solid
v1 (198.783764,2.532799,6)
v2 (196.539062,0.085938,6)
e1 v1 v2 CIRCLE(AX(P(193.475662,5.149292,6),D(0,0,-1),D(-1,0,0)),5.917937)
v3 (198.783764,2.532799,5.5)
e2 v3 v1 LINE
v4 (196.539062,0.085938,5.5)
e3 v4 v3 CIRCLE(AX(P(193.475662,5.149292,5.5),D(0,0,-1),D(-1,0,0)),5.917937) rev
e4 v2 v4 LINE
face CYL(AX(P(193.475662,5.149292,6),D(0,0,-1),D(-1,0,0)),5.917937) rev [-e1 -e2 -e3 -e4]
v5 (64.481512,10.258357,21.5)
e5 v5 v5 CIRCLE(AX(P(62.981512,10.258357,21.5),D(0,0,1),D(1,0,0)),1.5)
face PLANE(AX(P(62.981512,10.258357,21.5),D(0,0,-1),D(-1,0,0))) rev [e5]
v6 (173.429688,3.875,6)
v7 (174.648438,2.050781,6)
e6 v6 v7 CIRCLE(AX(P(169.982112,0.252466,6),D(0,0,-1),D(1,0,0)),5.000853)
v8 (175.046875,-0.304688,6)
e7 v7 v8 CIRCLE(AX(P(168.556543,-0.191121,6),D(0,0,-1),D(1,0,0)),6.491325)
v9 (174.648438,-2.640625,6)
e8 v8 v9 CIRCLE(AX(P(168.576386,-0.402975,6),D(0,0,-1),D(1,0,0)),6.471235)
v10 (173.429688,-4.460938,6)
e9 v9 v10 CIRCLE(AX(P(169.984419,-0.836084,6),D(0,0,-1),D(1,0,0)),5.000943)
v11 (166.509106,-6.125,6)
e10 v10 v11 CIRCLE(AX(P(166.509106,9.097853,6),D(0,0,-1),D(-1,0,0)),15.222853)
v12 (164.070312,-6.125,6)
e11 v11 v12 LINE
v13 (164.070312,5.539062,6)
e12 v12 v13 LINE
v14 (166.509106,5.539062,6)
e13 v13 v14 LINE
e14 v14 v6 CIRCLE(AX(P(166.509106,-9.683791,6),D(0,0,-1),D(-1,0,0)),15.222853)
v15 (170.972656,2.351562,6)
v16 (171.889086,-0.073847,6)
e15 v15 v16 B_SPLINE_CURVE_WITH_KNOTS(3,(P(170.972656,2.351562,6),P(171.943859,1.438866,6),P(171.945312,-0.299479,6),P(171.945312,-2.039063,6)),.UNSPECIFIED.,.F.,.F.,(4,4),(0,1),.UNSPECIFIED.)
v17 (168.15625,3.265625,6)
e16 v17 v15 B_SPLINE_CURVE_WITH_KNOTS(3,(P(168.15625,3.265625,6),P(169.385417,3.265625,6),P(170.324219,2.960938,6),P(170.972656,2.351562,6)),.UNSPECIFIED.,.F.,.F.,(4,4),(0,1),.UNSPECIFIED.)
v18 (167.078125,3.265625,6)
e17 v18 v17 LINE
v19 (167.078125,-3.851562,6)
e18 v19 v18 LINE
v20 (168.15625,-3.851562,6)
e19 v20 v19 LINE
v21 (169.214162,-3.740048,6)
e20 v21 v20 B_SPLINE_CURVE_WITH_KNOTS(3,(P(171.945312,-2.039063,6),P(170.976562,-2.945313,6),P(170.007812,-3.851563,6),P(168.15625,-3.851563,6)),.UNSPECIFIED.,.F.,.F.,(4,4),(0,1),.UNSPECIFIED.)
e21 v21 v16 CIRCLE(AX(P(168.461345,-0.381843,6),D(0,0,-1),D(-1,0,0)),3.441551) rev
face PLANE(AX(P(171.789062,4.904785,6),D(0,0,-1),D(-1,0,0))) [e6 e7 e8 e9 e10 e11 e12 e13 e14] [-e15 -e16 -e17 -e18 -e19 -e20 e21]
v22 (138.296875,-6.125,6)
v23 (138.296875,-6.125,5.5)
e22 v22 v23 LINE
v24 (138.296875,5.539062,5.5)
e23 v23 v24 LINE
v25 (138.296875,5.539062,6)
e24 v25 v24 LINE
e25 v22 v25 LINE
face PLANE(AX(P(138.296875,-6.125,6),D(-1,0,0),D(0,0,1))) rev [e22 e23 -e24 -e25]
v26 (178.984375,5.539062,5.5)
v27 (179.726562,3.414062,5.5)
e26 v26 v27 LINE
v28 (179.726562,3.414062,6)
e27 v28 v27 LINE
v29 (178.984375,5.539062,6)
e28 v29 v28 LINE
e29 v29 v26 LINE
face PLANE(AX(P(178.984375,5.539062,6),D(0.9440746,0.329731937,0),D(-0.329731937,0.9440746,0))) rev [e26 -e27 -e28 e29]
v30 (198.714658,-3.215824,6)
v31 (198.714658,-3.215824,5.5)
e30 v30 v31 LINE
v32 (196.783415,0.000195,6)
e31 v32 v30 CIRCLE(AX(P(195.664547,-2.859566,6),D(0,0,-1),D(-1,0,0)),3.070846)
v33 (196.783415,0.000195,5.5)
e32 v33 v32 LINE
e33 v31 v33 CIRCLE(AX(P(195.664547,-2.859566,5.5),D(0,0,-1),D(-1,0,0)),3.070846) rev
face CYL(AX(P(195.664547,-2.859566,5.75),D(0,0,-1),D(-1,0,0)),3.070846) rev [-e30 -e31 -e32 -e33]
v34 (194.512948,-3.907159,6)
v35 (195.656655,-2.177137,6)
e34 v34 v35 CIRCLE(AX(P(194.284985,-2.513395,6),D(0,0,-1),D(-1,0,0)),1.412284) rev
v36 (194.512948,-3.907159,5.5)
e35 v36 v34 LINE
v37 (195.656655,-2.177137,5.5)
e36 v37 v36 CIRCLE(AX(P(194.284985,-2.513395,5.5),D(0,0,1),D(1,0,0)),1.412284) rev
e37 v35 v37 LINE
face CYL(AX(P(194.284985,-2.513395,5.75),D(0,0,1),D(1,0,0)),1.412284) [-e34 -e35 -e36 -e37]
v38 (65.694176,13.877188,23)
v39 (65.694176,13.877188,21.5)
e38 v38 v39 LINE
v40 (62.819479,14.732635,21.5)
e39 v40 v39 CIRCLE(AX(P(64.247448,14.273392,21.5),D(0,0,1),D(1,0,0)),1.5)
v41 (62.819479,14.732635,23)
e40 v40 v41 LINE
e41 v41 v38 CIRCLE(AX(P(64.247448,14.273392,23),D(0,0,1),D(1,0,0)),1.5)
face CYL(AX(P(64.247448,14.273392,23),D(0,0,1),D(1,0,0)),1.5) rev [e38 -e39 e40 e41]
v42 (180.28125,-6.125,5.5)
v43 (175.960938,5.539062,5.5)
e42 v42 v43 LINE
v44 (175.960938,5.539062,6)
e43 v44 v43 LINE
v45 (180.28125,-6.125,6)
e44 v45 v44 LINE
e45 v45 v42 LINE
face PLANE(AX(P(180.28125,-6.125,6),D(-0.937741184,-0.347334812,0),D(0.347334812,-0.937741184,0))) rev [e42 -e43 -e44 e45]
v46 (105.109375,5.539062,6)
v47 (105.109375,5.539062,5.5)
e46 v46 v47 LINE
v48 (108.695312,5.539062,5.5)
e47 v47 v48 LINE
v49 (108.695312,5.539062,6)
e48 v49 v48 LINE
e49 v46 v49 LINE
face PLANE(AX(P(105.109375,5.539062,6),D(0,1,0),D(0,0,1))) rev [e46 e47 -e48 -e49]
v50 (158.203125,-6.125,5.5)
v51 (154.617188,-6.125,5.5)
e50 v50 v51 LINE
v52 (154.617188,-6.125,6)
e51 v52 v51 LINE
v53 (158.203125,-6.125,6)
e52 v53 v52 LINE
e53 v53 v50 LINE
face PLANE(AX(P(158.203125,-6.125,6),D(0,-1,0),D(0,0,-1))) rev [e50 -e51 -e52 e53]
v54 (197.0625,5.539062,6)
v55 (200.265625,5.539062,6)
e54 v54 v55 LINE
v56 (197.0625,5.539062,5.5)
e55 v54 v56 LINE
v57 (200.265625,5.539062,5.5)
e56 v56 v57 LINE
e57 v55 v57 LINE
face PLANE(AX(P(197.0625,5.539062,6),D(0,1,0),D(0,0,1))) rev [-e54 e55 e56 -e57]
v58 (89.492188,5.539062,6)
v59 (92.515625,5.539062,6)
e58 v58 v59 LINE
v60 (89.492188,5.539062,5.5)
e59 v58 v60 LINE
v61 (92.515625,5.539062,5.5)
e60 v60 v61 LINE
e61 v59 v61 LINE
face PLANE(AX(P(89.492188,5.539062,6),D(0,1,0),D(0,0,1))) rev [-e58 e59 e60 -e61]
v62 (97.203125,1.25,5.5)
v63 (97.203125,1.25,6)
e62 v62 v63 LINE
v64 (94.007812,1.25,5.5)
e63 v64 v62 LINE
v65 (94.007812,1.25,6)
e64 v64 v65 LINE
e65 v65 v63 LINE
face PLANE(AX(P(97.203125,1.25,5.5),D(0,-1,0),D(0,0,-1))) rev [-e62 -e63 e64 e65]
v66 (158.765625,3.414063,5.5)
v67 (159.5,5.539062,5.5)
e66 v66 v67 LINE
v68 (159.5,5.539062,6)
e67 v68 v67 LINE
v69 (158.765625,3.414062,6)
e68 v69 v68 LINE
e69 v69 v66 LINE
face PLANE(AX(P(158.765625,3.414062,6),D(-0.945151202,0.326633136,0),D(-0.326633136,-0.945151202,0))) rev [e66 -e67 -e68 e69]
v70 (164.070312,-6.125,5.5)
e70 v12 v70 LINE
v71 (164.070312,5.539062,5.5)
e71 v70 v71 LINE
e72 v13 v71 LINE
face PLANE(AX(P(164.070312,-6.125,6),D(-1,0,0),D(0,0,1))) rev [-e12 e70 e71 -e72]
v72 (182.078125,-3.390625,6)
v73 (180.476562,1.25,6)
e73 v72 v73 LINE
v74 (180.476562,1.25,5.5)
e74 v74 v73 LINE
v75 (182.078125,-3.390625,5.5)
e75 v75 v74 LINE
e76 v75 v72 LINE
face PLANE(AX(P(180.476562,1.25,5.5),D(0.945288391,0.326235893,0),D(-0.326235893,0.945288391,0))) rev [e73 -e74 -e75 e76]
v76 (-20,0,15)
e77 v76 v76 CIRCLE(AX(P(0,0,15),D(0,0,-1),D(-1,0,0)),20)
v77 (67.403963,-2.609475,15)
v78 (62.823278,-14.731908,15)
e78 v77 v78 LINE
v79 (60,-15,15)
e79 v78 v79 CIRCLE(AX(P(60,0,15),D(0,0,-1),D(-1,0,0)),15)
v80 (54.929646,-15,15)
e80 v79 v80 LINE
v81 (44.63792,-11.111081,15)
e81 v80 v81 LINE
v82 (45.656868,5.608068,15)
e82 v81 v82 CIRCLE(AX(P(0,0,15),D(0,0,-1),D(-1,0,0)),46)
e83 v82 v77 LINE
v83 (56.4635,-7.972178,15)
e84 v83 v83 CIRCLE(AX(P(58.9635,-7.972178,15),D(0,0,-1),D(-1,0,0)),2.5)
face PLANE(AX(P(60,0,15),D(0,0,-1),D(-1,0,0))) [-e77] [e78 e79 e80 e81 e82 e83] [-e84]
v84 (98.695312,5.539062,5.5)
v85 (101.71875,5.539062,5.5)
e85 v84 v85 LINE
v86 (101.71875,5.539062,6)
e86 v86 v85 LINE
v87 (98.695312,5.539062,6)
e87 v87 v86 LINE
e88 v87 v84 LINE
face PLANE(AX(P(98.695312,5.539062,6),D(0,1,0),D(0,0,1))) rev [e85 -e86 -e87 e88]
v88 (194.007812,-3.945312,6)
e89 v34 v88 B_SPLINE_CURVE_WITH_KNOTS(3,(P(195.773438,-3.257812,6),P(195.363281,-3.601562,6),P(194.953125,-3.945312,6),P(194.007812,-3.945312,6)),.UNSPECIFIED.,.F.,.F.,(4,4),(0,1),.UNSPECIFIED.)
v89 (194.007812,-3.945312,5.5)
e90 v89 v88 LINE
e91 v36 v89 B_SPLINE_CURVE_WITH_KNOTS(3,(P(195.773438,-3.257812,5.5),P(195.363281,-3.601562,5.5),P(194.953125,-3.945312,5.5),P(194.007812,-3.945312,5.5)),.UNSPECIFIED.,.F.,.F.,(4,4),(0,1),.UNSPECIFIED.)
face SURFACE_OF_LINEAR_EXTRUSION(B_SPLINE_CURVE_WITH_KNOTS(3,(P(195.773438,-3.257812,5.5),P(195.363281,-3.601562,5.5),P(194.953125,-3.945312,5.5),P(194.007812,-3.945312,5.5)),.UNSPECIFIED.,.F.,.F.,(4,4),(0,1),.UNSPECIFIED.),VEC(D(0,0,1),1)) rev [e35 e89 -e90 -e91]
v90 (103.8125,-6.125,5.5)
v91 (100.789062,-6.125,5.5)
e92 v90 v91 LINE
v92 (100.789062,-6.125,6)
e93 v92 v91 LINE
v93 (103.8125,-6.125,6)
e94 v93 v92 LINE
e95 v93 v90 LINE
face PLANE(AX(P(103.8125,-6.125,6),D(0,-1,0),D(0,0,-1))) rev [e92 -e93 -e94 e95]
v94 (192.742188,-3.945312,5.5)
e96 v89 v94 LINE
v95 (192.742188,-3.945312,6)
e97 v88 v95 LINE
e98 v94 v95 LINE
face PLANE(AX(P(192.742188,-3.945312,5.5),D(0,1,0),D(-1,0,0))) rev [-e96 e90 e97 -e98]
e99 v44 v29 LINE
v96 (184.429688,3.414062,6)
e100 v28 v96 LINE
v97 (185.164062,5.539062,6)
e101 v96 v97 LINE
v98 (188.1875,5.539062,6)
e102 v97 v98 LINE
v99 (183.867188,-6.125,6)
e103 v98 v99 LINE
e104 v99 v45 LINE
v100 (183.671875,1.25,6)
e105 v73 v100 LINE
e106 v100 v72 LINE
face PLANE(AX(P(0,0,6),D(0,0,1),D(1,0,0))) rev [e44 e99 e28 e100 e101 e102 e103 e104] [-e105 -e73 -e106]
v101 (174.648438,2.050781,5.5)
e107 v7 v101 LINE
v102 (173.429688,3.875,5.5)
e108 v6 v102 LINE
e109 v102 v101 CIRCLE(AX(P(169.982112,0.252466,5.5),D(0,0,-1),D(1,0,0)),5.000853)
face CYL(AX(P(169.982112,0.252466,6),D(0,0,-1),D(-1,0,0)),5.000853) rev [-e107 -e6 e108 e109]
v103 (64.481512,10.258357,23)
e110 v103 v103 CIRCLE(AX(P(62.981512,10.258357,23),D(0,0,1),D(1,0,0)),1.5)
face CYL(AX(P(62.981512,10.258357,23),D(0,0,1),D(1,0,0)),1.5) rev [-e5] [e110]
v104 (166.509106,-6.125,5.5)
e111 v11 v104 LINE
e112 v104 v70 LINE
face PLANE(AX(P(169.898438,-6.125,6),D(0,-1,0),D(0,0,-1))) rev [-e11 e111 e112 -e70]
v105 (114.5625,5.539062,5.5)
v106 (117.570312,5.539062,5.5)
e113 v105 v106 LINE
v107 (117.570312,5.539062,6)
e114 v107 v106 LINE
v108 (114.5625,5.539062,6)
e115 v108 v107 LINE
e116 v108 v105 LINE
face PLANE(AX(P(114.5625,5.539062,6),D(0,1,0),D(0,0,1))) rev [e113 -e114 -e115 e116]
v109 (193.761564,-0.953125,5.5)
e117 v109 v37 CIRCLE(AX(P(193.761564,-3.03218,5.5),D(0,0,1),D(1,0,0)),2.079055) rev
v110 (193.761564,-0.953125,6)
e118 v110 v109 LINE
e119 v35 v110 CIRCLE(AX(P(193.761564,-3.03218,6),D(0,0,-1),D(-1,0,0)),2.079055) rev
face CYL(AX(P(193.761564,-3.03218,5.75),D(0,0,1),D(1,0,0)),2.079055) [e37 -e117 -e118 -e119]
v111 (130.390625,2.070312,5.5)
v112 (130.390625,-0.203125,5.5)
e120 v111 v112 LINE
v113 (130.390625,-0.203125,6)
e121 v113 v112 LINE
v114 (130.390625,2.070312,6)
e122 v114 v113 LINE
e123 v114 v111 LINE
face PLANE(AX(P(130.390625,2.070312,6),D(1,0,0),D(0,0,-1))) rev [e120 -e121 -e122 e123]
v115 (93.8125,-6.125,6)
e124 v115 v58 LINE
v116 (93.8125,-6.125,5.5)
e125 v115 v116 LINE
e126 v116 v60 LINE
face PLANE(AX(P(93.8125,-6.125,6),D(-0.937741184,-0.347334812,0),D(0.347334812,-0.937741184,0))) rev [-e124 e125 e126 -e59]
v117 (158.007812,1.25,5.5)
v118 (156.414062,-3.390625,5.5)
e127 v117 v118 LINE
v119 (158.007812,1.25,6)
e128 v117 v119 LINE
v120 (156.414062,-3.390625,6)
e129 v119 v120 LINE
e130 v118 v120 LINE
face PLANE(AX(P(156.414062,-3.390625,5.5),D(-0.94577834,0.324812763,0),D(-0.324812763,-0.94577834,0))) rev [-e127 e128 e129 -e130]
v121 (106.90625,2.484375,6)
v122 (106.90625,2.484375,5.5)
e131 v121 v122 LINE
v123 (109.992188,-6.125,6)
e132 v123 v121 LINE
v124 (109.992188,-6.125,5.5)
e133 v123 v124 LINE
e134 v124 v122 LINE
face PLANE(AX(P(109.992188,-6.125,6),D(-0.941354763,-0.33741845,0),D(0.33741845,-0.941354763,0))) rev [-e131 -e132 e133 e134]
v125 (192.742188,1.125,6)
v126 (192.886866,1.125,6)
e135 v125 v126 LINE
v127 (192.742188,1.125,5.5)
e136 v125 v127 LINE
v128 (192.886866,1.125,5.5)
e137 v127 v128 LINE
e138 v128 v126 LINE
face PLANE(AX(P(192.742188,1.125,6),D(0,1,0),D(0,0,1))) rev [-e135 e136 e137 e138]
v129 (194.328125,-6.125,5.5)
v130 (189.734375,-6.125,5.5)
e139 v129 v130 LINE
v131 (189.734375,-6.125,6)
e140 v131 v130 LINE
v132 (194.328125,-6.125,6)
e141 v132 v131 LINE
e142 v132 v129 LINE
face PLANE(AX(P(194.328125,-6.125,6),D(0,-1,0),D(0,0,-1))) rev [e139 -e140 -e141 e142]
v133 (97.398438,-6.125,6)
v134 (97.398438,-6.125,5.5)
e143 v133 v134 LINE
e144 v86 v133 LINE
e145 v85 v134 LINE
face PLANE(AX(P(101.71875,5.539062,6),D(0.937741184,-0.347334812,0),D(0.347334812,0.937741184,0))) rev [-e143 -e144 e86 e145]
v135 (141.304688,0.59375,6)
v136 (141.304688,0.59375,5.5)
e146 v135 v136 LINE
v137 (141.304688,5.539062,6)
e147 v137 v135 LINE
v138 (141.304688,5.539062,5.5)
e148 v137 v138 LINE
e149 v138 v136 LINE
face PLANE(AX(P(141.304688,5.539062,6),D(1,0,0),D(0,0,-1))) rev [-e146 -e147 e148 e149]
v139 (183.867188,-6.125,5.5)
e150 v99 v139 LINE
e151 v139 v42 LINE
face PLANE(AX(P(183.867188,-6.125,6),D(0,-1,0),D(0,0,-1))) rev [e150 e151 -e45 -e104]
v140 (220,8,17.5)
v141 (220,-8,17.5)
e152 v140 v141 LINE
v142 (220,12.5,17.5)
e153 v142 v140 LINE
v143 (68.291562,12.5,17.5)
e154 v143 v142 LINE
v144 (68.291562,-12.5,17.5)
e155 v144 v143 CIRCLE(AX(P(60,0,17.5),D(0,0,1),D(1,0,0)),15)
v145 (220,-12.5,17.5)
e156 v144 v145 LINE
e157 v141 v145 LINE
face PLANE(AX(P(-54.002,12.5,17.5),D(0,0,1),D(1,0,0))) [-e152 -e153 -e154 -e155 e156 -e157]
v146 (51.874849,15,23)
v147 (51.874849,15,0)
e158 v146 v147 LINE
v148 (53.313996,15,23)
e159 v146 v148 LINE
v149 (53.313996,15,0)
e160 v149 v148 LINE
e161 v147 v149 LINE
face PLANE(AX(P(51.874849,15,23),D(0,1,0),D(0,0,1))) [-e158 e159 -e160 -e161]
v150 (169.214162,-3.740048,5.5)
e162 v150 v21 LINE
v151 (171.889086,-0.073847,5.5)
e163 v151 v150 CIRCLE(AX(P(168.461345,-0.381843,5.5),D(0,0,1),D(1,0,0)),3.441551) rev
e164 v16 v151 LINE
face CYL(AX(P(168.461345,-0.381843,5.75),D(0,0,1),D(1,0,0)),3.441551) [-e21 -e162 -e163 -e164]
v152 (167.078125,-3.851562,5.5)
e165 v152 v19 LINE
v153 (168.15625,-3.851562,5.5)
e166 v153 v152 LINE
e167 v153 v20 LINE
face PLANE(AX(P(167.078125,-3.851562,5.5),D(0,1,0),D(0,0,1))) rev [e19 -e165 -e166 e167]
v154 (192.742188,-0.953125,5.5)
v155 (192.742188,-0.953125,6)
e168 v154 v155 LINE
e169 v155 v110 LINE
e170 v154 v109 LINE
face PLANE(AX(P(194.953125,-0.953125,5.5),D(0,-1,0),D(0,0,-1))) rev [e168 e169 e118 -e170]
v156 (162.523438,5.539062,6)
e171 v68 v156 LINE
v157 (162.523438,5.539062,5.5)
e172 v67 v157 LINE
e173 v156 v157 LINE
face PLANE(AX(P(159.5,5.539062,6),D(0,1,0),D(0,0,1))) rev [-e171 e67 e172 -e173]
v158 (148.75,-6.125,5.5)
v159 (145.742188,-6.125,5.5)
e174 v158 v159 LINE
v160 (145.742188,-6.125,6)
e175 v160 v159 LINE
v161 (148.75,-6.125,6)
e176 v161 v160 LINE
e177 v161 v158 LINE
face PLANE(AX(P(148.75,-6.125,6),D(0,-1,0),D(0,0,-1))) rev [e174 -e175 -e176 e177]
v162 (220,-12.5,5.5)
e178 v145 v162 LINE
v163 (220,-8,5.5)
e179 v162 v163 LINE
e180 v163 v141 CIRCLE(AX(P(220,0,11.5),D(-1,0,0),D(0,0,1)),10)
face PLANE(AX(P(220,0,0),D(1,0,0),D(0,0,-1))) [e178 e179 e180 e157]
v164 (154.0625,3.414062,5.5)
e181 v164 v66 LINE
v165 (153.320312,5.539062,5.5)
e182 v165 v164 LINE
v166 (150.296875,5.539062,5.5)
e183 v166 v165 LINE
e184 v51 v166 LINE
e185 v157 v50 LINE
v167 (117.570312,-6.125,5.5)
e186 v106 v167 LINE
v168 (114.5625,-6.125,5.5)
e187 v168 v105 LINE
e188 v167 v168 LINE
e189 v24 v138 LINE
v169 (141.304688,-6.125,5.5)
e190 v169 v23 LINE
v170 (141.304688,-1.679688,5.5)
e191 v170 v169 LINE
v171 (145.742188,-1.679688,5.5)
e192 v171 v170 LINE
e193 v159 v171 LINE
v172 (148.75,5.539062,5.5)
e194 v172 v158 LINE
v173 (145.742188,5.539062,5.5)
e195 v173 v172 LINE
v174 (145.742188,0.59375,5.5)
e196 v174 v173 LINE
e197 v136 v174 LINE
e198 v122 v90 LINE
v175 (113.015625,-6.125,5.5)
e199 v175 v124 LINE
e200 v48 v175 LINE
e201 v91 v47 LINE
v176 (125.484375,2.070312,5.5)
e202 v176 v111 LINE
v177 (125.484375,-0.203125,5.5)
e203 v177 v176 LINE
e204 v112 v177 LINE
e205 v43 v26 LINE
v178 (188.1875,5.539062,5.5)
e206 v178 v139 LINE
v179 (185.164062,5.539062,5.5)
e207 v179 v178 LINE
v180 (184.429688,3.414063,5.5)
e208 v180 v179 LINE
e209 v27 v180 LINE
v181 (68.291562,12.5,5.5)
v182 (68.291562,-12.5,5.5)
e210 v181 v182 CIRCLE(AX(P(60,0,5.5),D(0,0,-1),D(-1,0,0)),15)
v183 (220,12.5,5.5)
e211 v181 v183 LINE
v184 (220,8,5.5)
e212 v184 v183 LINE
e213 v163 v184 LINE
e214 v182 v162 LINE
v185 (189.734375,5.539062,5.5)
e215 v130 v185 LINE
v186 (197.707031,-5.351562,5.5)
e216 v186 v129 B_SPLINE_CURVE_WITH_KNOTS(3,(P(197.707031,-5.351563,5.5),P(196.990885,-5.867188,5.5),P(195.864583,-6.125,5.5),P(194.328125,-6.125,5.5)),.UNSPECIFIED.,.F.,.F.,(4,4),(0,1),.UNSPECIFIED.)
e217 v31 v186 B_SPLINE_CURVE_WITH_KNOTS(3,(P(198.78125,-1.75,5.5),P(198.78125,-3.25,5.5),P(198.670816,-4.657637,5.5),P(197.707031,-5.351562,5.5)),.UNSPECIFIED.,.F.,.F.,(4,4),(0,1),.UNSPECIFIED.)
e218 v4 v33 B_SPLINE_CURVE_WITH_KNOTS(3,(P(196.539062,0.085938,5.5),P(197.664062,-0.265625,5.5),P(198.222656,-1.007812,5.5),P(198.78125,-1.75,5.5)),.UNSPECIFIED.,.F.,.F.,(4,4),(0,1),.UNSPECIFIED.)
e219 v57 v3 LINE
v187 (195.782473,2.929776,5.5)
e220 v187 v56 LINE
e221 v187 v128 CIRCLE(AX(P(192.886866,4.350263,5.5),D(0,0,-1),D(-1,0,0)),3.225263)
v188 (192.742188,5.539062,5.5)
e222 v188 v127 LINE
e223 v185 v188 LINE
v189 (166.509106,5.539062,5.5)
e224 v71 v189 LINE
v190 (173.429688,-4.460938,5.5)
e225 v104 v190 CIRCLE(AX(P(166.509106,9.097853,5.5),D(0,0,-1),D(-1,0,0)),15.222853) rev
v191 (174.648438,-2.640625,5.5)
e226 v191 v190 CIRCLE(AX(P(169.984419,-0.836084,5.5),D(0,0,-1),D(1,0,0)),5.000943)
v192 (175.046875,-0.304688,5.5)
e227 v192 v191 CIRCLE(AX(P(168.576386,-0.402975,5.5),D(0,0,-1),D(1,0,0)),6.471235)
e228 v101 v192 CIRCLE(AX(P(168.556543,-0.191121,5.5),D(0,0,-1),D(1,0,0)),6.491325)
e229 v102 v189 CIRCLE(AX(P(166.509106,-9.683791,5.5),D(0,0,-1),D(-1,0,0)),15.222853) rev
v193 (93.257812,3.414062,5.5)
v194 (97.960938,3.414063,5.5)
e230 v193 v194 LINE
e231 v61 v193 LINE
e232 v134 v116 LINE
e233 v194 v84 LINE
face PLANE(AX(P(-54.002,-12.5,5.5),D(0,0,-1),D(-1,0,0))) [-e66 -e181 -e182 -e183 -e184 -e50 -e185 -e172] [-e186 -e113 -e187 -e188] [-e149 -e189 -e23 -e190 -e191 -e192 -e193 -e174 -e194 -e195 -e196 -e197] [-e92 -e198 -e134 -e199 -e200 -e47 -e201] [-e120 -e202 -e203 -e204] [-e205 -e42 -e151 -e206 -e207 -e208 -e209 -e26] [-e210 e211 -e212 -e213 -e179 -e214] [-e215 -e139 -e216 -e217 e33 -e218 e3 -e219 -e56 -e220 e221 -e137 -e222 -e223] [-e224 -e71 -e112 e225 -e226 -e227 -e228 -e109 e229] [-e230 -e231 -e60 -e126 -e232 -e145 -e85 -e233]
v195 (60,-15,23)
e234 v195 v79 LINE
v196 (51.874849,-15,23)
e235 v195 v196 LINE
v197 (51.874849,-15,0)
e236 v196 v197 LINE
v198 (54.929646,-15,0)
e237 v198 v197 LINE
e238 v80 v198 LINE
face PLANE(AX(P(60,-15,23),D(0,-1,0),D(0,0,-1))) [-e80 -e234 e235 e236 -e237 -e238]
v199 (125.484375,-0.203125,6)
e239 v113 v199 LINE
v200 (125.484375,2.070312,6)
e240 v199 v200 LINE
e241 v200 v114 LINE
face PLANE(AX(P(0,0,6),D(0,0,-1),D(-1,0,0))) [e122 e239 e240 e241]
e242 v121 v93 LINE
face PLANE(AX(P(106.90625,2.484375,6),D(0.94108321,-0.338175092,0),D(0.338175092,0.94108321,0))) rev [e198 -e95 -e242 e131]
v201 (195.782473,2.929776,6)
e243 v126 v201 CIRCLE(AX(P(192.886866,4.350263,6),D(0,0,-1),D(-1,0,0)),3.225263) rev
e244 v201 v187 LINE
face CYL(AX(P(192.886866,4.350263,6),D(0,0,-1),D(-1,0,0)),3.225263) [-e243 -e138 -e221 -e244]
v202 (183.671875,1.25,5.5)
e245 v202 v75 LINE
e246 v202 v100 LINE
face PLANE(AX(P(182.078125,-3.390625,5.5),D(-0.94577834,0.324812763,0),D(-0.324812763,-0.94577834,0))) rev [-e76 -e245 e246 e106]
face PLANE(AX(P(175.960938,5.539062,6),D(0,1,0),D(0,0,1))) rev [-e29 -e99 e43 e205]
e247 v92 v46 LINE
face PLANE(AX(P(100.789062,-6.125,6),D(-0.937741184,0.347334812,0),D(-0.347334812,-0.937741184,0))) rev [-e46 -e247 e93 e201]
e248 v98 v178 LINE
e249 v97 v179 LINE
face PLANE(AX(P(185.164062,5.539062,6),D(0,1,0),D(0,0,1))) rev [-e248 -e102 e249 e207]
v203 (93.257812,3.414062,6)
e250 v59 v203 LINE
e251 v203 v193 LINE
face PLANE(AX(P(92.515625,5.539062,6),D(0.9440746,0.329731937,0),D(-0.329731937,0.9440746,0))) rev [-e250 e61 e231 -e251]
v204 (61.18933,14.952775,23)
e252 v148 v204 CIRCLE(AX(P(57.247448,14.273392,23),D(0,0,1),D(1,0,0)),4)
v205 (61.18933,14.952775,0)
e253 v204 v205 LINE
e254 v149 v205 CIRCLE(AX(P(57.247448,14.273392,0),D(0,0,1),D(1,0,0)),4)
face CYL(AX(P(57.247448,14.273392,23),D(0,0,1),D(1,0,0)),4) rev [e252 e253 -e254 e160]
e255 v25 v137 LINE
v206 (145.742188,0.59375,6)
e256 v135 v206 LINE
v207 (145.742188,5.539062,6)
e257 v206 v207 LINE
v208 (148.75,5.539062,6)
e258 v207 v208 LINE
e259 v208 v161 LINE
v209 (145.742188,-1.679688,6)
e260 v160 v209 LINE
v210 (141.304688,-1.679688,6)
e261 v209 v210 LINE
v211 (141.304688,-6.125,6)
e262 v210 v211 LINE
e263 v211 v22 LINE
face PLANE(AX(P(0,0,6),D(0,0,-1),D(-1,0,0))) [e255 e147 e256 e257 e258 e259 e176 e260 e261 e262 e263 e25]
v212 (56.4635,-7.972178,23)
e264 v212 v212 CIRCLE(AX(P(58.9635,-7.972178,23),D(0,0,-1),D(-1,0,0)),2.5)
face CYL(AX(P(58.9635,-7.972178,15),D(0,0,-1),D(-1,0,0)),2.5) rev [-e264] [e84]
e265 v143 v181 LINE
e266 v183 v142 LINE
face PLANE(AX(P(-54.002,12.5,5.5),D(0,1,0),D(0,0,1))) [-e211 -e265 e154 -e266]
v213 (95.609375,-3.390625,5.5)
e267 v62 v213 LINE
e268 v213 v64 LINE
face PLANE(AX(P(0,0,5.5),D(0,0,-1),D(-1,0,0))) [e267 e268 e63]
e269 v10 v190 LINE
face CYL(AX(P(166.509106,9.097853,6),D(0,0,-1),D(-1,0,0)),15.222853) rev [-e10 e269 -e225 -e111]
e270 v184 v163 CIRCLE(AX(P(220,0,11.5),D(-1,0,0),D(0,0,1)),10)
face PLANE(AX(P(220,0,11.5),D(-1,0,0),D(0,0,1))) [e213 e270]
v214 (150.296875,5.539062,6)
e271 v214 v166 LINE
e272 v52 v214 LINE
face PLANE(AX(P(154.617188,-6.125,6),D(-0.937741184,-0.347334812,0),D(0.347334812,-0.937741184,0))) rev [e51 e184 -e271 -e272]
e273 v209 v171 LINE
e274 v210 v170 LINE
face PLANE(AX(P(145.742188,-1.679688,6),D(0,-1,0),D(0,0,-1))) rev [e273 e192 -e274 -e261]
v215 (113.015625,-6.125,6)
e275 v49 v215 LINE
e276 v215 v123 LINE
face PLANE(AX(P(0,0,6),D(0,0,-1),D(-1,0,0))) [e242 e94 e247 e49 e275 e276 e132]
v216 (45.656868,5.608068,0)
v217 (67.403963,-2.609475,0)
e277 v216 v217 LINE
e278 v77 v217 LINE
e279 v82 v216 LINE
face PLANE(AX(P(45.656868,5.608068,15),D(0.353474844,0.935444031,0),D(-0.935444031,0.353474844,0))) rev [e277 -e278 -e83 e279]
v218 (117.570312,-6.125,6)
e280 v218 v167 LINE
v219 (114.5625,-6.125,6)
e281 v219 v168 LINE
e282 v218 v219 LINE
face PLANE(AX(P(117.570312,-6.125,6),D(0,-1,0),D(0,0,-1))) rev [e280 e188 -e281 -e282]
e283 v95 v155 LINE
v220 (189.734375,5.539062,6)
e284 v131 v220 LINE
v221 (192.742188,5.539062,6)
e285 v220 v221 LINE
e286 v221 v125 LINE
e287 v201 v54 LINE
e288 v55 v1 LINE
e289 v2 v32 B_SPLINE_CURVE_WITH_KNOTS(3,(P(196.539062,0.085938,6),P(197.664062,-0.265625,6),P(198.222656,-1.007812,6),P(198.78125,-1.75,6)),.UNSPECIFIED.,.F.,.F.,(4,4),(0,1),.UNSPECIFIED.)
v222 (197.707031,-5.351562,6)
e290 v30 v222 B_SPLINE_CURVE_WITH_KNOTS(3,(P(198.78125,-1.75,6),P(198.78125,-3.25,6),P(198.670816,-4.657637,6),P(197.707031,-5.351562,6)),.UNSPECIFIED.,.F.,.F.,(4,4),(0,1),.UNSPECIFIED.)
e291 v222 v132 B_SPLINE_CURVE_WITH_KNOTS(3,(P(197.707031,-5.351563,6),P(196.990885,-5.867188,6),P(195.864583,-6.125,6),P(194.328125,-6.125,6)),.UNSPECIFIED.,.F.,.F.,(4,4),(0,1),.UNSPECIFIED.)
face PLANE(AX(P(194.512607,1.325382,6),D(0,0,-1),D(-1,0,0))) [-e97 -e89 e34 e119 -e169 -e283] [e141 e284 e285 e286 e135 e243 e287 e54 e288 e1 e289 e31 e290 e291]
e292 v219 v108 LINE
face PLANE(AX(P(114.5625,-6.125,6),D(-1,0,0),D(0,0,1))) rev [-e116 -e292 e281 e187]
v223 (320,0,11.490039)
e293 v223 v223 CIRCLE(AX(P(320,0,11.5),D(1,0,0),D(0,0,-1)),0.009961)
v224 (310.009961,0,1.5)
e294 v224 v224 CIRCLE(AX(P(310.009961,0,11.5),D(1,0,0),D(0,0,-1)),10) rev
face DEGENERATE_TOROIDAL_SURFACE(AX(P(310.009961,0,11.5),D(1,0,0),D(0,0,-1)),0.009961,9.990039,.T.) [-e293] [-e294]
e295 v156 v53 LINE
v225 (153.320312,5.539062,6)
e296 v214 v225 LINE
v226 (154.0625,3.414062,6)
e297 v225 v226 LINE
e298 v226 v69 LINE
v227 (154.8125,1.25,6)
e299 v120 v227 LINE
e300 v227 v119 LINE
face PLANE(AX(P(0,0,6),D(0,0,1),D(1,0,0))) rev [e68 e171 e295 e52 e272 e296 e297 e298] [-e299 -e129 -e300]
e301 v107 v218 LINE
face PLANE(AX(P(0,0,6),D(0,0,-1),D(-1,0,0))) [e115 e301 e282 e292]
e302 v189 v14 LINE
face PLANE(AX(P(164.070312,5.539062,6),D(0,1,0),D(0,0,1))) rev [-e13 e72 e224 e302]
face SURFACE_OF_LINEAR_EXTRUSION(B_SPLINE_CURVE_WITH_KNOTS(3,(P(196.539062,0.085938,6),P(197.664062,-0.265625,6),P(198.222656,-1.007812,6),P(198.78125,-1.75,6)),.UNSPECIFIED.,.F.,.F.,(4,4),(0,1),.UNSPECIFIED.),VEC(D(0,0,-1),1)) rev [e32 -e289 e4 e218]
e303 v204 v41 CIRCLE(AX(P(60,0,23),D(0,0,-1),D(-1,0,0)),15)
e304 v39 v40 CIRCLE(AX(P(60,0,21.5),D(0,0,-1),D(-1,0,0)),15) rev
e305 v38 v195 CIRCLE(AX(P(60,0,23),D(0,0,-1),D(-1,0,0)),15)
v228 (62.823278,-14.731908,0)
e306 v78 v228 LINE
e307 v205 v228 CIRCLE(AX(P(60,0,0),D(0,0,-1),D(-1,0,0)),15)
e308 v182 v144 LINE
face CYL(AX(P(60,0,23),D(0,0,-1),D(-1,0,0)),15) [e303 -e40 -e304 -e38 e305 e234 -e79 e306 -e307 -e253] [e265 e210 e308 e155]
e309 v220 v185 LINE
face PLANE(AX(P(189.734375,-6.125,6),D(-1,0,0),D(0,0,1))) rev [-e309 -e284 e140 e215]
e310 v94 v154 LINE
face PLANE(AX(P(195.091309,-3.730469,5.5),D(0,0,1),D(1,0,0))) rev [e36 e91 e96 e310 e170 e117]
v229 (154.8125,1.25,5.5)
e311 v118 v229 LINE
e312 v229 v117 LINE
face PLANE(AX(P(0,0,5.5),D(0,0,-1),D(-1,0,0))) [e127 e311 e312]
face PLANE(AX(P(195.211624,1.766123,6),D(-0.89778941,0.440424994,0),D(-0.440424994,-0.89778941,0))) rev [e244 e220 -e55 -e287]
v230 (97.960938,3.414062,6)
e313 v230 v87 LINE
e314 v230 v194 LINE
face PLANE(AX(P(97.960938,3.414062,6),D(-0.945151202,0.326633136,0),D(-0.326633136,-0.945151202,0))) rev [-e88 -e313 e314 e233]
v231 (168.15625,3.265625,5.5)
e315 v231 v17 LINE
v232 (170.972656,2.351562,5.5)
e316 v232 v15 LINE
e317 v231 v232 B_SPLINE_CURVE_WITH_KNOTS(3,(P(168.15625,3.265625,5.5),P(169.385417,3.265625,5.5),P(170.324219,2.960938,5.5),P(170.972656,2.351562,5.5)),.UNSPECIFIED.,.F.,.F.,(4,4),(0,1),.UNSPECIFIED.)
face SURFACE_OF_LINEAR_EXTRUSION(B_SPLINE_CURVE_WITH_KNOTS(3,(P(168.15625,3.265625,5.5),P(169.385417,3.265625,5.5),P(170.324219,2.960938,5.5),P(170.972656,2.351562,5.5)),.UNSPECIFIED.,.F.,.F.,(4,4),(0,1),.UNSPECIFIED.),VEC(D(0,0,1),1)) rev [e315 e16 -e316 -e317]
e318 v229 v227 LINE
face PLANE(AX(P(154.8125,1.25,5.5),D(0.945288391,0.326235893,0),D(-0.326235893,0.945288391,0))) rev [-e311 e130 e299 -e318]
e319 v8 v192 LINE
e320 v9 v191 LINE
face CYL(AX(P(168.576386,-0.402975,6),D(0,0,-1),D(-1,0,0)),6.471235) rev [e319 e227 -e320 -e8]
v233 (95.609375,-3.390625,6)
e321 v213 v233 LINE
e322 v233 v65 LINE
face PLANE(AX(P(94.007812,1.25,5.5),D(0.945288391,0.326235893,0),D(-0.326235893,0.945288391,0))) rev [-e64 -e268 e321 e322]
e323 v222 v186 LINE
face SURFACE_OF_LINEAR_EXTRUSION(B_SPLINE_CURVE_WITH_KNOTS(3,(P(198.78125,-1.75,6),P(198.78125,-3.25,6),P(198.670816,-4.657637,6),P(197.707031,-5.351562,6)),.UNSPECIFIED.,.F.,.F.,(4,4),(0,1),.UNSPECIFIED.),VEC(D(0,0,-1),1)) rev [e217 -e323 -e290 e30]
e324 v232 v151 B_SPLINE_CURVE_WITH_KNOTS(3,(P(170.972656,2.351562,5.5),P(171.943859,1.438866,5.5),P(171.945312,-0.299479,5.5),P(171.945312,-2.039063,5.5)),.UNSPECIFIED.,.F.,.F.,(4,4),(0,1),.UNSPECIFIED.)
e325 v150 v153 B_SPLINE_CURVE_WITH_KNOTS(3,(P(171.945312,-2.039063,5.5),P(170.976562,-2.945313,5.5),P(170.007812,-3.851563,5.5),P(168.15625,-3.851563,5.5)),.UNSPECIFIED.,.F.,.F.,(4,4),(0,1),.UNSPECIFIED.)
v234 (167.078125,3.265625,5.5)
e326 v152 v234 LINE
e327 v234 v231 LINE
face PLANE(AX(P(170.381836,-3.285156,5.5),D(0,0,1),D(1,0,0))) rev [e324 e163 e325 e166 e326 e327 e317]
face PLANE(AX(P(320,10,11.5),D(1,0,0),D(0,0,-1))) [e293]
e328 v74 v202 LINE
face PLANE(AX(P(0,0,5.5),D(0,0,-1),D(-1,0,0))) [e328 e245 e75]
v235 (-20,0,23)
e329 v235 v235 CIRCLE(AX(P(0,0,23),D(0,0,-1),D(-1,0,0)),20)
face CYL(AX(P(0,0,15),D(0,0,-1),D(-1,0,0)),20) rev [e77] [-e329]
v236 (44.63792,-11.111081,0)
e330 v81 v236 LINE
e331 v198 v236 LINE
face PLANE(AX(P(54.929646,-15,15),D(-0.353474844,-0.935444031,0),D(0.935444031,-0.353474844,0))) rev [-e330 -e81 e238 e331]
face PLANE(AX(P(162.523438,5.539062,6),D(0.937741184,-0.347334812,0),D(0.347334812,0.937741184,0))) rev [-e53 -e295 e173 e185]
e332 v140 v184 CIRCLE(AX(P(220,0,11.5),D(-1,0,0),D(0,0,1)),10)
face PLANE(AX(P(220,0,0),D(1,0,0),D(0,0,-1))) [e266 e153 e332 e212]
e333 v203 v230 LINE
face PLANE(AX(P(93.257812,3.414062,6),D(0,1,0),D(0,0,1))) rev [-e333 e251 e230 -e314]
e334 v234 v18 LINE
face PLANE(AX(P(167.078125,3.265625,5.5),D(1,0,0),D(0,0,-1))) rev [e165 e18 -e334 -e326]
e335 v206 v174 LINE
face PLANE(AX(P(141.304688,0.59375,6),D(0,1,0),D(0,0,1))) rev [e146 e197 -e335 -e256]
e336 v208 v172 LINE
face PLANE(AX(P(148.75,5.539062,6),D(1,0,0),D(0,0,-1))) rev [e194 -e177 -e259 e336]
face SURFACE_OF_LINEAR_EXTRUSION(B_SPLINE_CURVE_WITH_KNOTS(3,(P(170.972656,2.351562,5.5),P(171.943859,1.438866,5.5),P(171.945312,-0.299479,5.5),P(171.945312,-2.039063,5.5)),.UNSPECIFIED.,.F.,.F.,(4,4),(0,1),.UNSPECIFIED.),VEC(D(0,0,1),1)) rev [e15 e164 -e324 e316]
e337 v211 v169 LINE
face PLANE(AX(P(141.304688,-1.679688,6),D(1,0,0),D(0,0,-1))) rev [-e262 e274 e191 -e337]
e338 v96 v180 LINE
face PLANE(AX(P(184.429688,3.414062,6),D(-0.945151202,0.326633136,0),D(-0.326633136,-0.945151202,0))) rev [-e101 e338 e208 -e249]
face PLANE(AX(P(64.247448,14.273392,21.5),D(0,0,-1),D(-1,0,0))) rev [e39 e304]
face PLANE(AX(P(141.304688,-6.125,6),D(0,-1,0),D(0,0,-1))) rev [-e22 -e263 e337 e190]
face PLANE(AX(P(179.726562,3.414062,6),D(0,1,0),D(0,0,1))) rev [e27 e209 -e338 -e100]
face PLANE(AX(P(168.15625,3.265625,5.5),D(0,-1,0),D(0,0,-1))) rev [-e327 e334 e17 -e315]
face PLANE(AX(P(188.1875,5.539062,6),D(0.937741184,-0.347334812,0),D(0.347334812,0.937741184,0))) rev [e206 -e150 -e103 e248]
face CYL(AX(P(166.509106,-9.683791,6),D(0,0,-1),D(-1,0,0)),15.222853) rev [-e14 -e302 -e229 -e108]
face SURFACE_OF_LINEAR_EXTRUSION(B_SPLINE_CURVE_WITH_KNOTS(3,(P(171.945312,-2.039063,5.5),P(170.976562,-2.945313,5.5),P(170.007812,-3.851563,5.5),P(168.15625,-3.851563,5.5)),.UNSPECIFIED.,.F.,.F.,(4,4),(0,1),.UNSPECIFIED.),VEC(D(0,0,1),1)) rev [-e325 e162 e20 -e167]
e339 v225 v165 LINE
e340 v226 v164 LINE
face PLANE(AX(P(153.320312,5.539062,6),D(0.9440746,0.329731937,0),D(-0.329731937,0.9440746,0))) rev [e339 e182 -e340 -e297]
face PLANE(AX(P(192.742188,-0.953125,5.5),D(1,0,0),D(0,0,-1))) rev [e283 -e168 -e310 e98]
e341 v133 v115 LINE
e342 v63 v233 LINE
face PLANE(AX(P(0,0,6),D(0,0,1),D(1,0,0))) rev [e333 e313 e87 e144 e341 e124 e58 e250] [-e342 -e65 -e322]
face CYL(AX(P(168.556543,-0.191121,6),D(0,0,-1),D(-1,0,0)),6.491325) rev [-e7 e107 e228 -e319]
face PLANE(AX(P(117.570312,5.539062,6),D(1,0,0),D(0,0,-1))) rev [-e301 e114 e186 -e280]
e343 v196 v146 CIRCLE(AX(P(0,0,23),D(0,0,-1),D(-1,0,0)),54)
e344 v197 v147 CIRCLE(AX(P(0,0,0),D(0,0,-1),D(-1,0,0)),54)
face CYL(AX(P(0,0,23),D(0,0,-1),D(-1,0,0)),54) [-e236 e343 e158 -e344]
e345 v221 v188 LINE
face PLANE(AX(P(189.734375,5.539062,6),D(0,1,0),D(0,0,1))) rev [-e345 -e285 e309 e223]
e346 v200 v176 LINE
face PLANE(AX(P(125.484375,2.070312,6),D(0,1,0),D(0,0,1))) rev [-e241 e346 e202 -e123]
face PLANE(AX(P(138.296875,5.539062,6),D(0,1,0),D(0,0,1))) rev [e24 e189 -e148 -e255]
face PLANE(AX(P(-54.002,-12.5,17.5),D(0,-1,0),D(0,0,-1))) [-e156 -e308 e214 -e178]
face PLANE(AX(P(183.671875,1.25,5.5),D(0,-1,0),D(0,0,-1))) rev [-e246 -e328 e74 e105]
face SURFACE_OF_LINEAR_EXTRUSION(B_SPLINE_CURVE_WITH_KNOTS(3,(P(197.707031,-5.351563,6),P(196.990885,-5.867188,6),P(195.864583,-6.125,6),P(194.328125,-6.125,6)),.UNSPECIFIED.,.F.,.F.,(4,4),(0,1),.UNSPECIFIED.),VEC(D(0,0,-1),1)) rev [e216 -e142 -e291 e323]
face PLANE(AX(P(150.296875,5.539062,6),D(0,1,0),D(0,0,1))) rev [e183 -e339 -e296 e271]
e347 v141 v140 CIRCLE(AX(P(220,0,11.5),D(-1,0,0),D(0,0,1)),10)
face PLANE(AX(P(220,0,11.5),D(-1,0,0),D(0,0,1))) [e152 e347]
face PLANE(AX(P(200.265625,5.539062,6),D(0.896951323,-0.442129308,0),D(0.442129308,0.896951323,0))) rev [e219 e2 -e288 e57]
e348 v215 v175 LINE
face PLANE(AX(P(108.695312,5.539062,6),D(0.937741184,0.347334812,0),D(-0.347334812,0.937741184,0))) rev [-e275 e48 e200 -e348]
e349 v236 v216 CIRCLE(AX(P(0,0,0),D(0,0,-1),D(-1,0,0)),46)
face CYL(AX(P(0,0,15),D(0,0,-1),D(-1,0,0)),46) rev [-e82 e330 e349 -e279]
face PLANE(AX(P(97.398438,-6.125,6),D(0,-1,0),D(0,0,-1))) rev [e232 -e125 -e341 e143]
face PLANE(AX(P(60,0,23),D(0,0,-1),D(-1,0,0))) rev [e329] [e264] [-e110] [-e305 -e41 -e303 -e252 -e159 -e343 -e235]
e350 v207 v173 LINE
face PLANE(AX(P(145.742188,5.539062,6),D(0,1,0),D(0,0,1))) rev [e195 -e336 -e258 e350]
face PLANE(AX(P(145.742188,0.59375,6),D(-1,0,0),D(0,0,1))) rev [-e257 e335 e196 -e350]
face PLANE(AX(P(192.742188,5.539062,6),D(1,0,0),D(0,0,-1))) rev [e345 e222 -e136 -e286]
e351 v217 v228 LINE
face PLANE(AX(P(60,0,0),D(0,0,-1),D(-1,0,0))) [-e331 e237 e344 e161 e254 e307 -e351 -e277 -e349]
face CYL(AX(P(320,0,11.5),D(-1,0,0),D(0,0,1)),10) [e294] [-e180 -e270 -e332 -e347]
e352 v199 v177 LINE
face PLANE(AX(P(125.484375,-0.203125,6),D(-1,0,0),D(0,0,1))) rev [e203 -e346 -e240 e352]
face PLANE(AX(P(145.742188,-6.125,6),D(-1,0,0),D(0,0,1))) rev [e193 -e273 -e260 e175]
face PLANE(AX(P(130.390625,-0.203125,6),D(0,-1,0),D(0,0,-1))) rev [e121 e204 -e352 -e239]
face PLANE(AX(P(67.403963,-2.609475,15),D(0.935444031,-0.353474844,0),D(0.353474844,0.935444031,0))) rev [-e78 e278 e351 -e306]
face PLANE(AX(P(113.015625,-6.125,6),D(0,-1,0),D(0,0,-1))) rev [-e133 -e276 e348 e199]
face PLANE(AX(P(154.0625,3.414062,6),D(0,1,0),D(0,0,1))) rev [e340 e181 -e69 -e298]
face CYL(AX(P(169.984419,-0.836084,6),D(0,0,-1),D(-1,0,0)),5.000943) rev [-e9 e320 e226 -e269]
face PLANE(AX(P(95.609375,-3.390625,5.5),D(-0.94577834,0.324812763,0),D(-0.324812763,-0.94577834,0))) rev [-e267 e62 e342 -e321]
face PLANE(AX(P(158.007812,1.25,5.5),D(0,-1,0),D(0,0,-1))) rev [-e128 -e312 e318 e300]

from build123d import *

# Parameters (mm, degrees)
BOSS_EXTRUDE1_DEPTH           = 23
CUT_EXTRUDE1_DEPTH            = 15
BOSS_EXTRUDE2_REACH           = 282.216
BOSS_EXTRUDE2_END_RADIUS      = 15
SKETCH3_W                     = 12
SKETCH3_H                     = 25
CUT_EXTRUDE2_DEPTH            = 0.5
BOSS_EXTRUDE3_DEPTH           = 0.5
CUT_EXTRUDE3_DEPTH            = 0.5
BOSS_EXTRUDE4_DEPTH           = 0.5
CUT_EXTRUDE4_DEPTH            = 0.5
BOSS_EXTRUDE5_DEPTH           = 0.5
CUT_EXTRUDE5_DEPTH            = 0.5
BOSS_EXTRUDE6_DEPTH           = 0.5
CUT_EXTRUDE6_DEPTH            = 0.5
BOSS_EXTRUDE7_DEPTH           = 0.5
CUT_EXTRUDE7_DEPTH            = 0.5
CUT_EXTRUDE8_DEPTH            = 0.5
SKETCH16_W                    = 4.90625
SKETCH16_H                    = 2.2734375
CUT_EXTRUDE9_DEPTH            = 0.5
SKETCH17_W                    = 3.0078125
SKETCH17_H                    = 11.6640625
CUT_EXTRUDE10_DEPTH           = 0.5
SKETCH18_W                    = 100
SKETCH18_H                    = 10
F_8_0_8_DIAMETER_HOLE1_D      = 8
F_5_0_5_DIAMETER_HOLE1_D      = 5
TAP_DRILL_FOR_M39_HELICOIL1_D = 40
F_3_0_3_DIAMETER_HOLE1_D      = 3
F_3_0_3_DIAMETER_HOLE1_DEPTH  = 1.5
FILLET1_R                     = 1.412284342
FILLET2_R                     = 2.07905533
FILLET3_R                     = 3.070846318
FILLET4_R                     = 3.22526269
FILLET5_R                     = 3.441550783
FILLET6_START                 = 5.5
FILLET6_DEPTH                 = 1.5
FILLET7_R                     = 9.990039186
FILLET8_START                 = 5.5
FILLET8_DEPTH                 = 1.5


with BuildPart() as part:
    # Sketch1 → Boss-Extrude1 (new body)
    with BuildSketch(Plane(origin=(0, 0, 0), x_dir=(-1, 0, 0), z_dir=(0, 0, -1))):
        with BuildLine():
            Line((-60, -15), (-51.874849397, -15))
            ThreePointArc((-51.874849397, -15), (54, 0), (-51.874849397, 15))
            Line((-51.874849397, 15), (-60, 15))
            ThreePointArc((-60, 15), (-75, 0), (-60, -15))
        make_face()
    extrude(amount=-BOSS_EXTRUDE1_DEPTH)

    # Sketch2 → Cut-Extrude1 (cut)
    with BuildSketch(Plane(origin=(0, 0, 0), x_dir=(-1, 0, 0), z_dir=(0, 0, -1))):
        with BuildLine():
            Line((-60, -15), (-54.929646445, -15))
            Line((-54.929646445, -15), (-44.637919846, -11.111080587))
            ThreePointArc((-44.637919846, -11.111080587), (45.9148086, 2.798276473), (-45.656867784, 5.608067777))
            Line((-45.656867784, 5.608067777), (-67.403963318, -2.609474848))
            Line((-67.403963318, -2.609474848), (-62.823277674, -14.731907656))
            ThreePointArc((-62.823277674, -14.731907656), (-61.417988922, -14.932826505), (-60, -15))
        make_face()
    extrude(amount=-CUT_EXTRUDE1_DEPTH, mode=Mode.SUBTRACT)

    # Boss-Extrude2: up to this cylinder (the profile starts outside it)
    boss_extrude2_end = Plane(origin=(60, 0, 11.5), z_dir=(0, 0, -1)) * Cylinder(BOSS_EXTRUDE2_END_RADIUS, 595.432, mode=Mode.PRIVATE)
    # Sketch3 → Boss-Extrude2 (add, up to the surface)
    with BuildSketch(Plane(origin=(220, 0, 0), x_dir=(0, 0, -1), z_dir=(1, 0, 0)), mode=Mode.PRIVATE) as boss_extrude2_sk1:
        with Locations((-11.5, 0)):
            Rectangle(SKETCH3_W, SKETCH3_H)
    boss_extrude2_tool1 = extrude(boss_extrude2_sk1.sketch, amount=-BOSS_EXTRUDE2_REACH, mode=Mode.PRIVATE) - boss_extrude2_end
    add(boss_extrude2_tool1.solids().sort_by_distance((220, 0, 11.5))[0])

    # Sketch4 → Cut-Extrude2 (cut)
    with BuildSketch(Plane(origin=(0, 0, 5.5), x_dir=(-1, 0, 0), z_dir=(0, 0, -1))):
        with BuildLine():
            Line((-164.0703125, -6.125), (-164.0703125, 5.5390625))
            Line((-164.0703125, 5.5390625), (-169.8671875, 5.5390625))
            add(Edge.make_bspline(
                [(-173.4296875, 3.875), (-172.4921875, 4.78125), (-171.1796875, 5.16015625), (-169.8671875, 5.5390625)],
                knots=[0, 0, 0, 0, 1, 1, 1, 1], degree=3))
            ThreePointArc((-173.4296875, 3.875), (-174.140331686, 3.030547983), (-174.6484375, 2.05078125))
            ThreePointArc((-174.6484375, 2.05078125), (-174.956946445, 0.891533774), (-175.046875, -0.3046875))
            ThreePointArc((-175.046875, -0.3046875), (-174.955491082, -1.491049482), (-174.6484375, -2.640625))
            ThreePointArc((-174.6484375, -2.640625), (-174.139959679, -3.618334726), (-173.4296875, -4.4609375))
            add(Edge.make_bspline(
                [(-169.8984375, -6.125), (-171.19921875, -5.74609375), (-172.5, -5.3671875), (-173.4296875, -4.4609375)],
                knots=[0, 0, 0, 0, 1, 1, 1, 1], degree=3))
            Line((-169.8984375, -6.125), (-164.0703125, -6.125))
        make_face()
    extrude(amount=-CUT_EXTRUDE2_DEPTH, mode=Mode.SUBTRACT)

    # Sketch5 → Boss-Extrude3 (add)
    with BuildSketch(Plane(origin=(0, 0, 6), x_dir=(-1, 0, 0), z_dir=(0, 0, -1))):
        with BuildLine():
            Line((-167.078125, -3.8515625), (-168.15625, -3.8515625))
            add(Edge.make_bspline(
                [(-171.9453125, -2.0390625), (-170.9765625, -2.9453125), (-170.0078125, -3.8515625), (-168.15625, -3.8515625)],
                knots=[0, 0, 0, 0, 1, 1, 1, 1], degree=3))
            add(Edge.make_bspline(
                [(-170.97265625, 2.3515625), (-171.943858604, 1.438866312), (-171.9453125, -0.299479167), (-171.9453125, -2.0390625)],
                knots=[0, 0, 0, 0, 1, 1, 1, 1], degree=3))
            add(Edge.make_bspline(
                [(-168.15625, 3.265625), (-169.385416667, 3.265625), (-170.32421875, 2.9609375), (-170.97265625, 2.3515625)],
                knots=[0, 0, 0, 0, 1, 1, 1, 1], degree=3))
            Line((-168.15625, 3.265625), (-167.078125, 3.265625))
            Line((-167.078125, 3.265625), (-167.078125, -3.8515625))
        make_face()
    extrude(amount=BOSS_EXTRUDE3_DEPTH)

    # Sketch6 → Cut-Extrude3 (cut)
    with BuildSketch(Plane(origin=(0, 0, 5.5), x_dir=(-1, 0, 0), z_dir=(0, 0, -1))):
        with BuildLine():
            Line((-192.7421875, 1.125), (-193.59375, 1.125))
            add(Edge.make_bspline(
                [(-195.211624157, 1.766123282), (-194.769989022, 1.445644688), (-194.328505801, 1.125), (-193.59375, 1.125)],
                knots=[0, 0, 0, 0, 1, 1, 1, 1], degree=3))
            Line((-195.211624157, 1.766123282), (-197.0625, 5.5390625))
            Line((-197.0625, 5.5390625), (-200.265625, 5.5390625))
            Line((-200.265625, 5.5390625), (-198.139271979, 1.225312831))
            add(Edge.make_bspline(
                [(-196.5390625, 0.0859375), (-197.158971594, 0.22718261), (-197.648837569, 0.72703147), (-198.139271979, 1.225312831)],
                knots=[0, 0, 0, 0, 1, 1, 1, 1], degree=3))
            add(Edge.make_bspline(
                [(-198.78125, -1.75), (-198.22265625, -1.0078125), (-197.6640625, -0.265625), (-196.5390625, 0.0859375)],
                knots=[0, 0, 0, 0, 1, 1, 1, 1], degree=3))
            add(Edge.make_bspline(
                [(-197.70703125, -5.3515625), (-198.670816297, -4.657637266), (-198.78125, -3.25), (-198.78125, -1.75)],
                knots=[0, 0, 0, 0, 1, 1, 1, 1], degree=3))
            add(Edge.make_bspline(
                [(-194.328125, -6.125), (-195.864583333, -6.125), (-196.990885417, -5.8671875), (-197.70703125, -5.3515625)],
                knots=[0, 0, 0, 0, 1, 1, 1, 1], degree=3))
            Line((-194.328125, -6.125), (-189.734375, -6.125))
            Line((-189.734375, -6.125), (-189.734375, 5.5390625))
            Line((-189.734375, 5.5390625), (-192.7421875, 5.5390625))
            Line((-192.7421875, 5.5390625), (-192.7421875, 1.125))
        make_face()
    extrude(amount=-CUT_EXTRUDE3_DEPTH, mode=Mode.SUBTRACT)

    # Sketch7 → Boss-Extrude4 (add)
    with BuildSketch(Plane(origin=(0, 0, 6), x_dir=(-1, 0, 0), z_dir=(0, 0, -1))):
        with BuildLine():
            Line((-192.7421875, -0.953125), (-192.7421875, -3.9453125))
            Line((-192.7421875, -3.9453125), (-194.0078125, -3.9453125))
            add(Edge.make_bspline(
                [(-195.7734375, -3.2578125), (-195.36328125, -3.6015625), (-194.953125, -3.9453125), (-194.0078125, -3.9453125)],
                knots=[0, 0, 0, 0, 1, 1, 1, 1], degree=3))
            add(Edge.make_bspline(
                [(-194.953125, -0.953125), (-195.498672634, -1.420737257), (-195.7734375, -2.1875), (-195.7734375, -3.2578125)],
                knots=[0, 0, 0, 0, 1, 1, 1, 1], degree=3))
            Line((-194.953125, -0.953125), (-192.7421875, -0.953125))
        make_face()
    extrude(amount=BOSS_EXTRUDE4_DEPTH)

    # Sketch8 → Cut-Extrude4 (cut)
    with BuildSketch(Plane(origin=(0, 0, 5.5), x_dir=(-1, 0, 0), z_dir=(0, 0, -1))):
        Polygon((-184.4296875, 3.4140625), (-185.1640625, 5.5390625), (-188.1875, 5.5390625), (-183.8671875, -6.125), (-180.28125, -6.125), (-175.9609375, 5.5390625), (-178.984375, 5.5390625), (-179.7265625, 3.4140625), align=None)
    extrude(amount=-CUT_EXTRUDE4_DEPTH, mode=Mode.SUBTRACT)

    # Sketch9 → Boss-Extrude5 (add)
    with BuildSketch(Plane(origin=(0, 0, 6), x_dir=(-1, 0, 0), z_dir=(0, 0, -1))):
        Polygon((-180.4765625, 1.25), (-182.078125, -3.390625), (-183.671875, 1.25), align=None)
    extrude(amount=BOSS_EXTRUDE5_DEPTH)

    # Sketch10 → Cut-Extrude5 (cut)
    with BuildSketch(Plane(origin=(0, 0, 5.5), x_dir=(-1, 0, 0), z_dir=(0, 0, -1))):
        Polygon((-158.765625, 3.4140625), (-159.5, 5.5390625), (-162.5234375, 5.5390625), (-158.203125, -6.125), (-154.6171875, -6.125), (-150.296875, 5.5390625), (-153.3203125, 5.5390625), (-154.0625, 3.4140625), align=None)
    extrude(amount=-CUT_EXTRUDE5_DEPTH, mode=Mode.SUBTRACT)

    # Sketch11 → Boss-Extrude6 (add)
    with BuildSketch(Plane(origin=(0, 0, 6), x_dir=(-1, 0, 0), z_dir=(0, 0, -1))):
        Polygon((-154.8125, 1.25), (-156.4140625, -3.390625), (-158.0078125, 1.25), align=None)
    extrude(amount=BOSS_EXTRUDE6_DEPTH)

    # Sketch12 → Cut-Extrude6 (cut)
    with BuildSketch(Plane(origin=(0, 0, 5.5), x_dir=(-1, 0, 0), z_dir=(0, 0, -1))):
        Polygon((-97.9609375, 3.4140625), (-98.6953125, 5.5390625), (-101.71875, 5.5390625), (-97.3984375, -6.125), (-93.8125, -6.125), (-89.4921875, 5.5390625), (-92.515625, 5.5390625), (-93.2578125, 3.4140625), align=None)
    extrude(amount=-CUT_EXTRUDE6_DEPTH, mode=Mode.SUBTRACT)

    # Sketch13 → Boss-Extrude7 (add)
    with BuildSketch(Plane(origin=(0, 0, 6), x_dir=(-1, 0, 0), z_dir=(0, 0, -1))):
        Polygon((-94.0078125, 1.25), (-95.609375, -3.390625), (-97.203125, 1.25), align=None)
    extrude(amount=BOSS_EXTRUDE7_DEPTH)

    # Sketch14 → Cut-Extrude7 (cut)
    with BuildSketch(Plane(origin=(0, 0, 5.5), x_dir=(-1, 0, 0), z_dir=(0, 0, -1))):
        Polygon((-138.296875, -6.125), (-138.296875, 5.5390625), (-141.3046875, 5.5390625), (-141.3046875, 0.59375), (-145.7421875, 0.59375), (-145.7421875, 5.5390625), (-148.75, 5.5390625), (-148.75, -6.125), (-145.7421875, -6.125), (-145.7421875, -1.6796875), (-141.3046875, -1.6796875), (-141.3046875, -6.125), align=None)
    extrude(amount=-CUT_EXTRUDE7_DEPTH, mode=Mode.SUBTRACT)

    # Sketch15 → Cut-Extrude8 (cut)
    with BuildSketch(Plane(origin=(0, 0, 5.5), x_dir=(-1, 0, 0), z_dir=(0, 0, -1))):
        Polygon((-100.7890625, -6.125), (-105.109375, 5.5390625), (-108.6953125, 5.5390625), (-113.015625, -6.125), (-109.9921875, -6.125), (-106.90625, 2.484375), (-103.8125, -6.125), align=None)
    extrude(amount=-CUT_EXTRUDE8_DEPTH, mode=Mode.SUBTRACT)

    # Sketch16 → Cut-Extrude9 (cut)
    with BuildSketch(Plane(origin=(0, 0, 5.5), x_dir=(-1, 0, 0), z_dir=(0, 0, -1))):
        with Locations((-127.9375, 0.93359375)):
            Rectangle(SKETCH16_W, SKETCH16_H)
    extrude(amount=-CUT_EXTRUDE9_DEPTH, mode=Mode.SUBTRACT)

    # Sketch17 → Cut-Extrude10 (cut)
    with BuildSketch(Plane(origin=(0, 0, 5.5), x_dir=(-1, 0, 0), z_dir=(0, 0, -1))):
        with Locations((-116.06640625, -0.29296875)):
            Rectangle(SKETCH17_W, SKETCH17_H)
    extrude(amount=-CUT_EXTRUDE10_DEPTH, mode=Mode.SUBTRACT)

    # Sketch18 → Revolve1 (revolve)
    with BuildSketch(Plane(origin=(0, 0, 11.5), x_dir=(-1, 0, 0), z_dir=(0, 0, -1)), mode=Mode.PRIVATE) as revolve1_sk:
        with Locations((-270, 5)):
            Rectangle(SKETCH18_W, SKETCH18_H)
    revolve(revolve1_sk.sketch.rotate(Axis((320, 0, 11.5), (-1, 0, 0)), 270), axis=Axis((320, 0, 11.5), (-1, 0, 0)))

    # Ø8.0 (8) Diameter Hole1 (through all)
    with Locations(Plane.XY.offset(23)):
        with Locations((57.24744785, 14.27339184)):
            Hole(F_8_0_8_DIAMETER_HOLE1_D / 2)

    # Ø5.0 (5) Diameter Hole1 (through all)
    with Locations(Plane(origin=(0, 0, 15), x_dir=(-1, 0, 0), z_dir=(0, 0, -1))):
        with Locations((-58.963500383, -7.972178032)):
            Hole(F_5_0_5_DIAMETER_HOLE1_D / 2)

    # Tap Drill for M39 Helicoil1 (through all)
    with Locations(Plane(origin=(0, 0, 15), x_dir=(-1, 0, 0), z_dir=(0, 0, -1))):
        with Locations((0, 0)):
            Hole(TAP_DRILL_FOR_M39_HELICOIL1_D / 2)

    # Ø3.0 (3) Diameter Hole1
    with Locations(Plane.XY.offset(23)):
        with Locations((62.98151216, 10.258356786), (64.24744785, 14.27339184)):
            Hole(F_3_0_3_DIAMETER_HOLE1_D / 2, depth=F_3_0_3_DIAMETER_HOLE1_DEPTH)

    # Fillet1
    fillet1_edges = [part.edges().sort_by_distance(p)[0] for p in [
        (195.7734375, -3.2578125, 5.75),
    ]]
    fillet(fillet1_edges, radius=FILLET1_R)

    # Fillet2
    # the kernel refuses this fillet: 2.07905533 mm, written as the material it takes off along each edge
    with BuildSketch(Plane(origin=(194.953125, -0.953125, 6), x_dir=(0.4983238238531012, -0.8669909841402178, 0), z_dir=(0, 0, -1))) as fillet2_piece_1:
        with BuildLine():
            CenterArc((1.208738801, 2.06911578), FILLET2_R, 209.8891669, 65.715646275)
            Line((-0.593783426, 1.033072978), (-0.62983387, 1.012352122))
            Line((-0.62983387, 1.012352122), (-0.036050445, -0.020720856))
            Line((-0.036050445, -0.020720856), (-0.013886584, -0.039193765))
            ThreePointArc((-0.013886584, -0.039193765), (0.708491184, -0.153595229), (1.415853949, -0.041382316))
            Line((1.415853949, -0.041382316), (1.411792867, 0))
        make_face()
    extrude(amount=4.029482168, mode=Mode.SUBTRACT)

    # Fillet3
    fillet3_edges = [part.edges().sort_by_distance(p)[0] for p in [
        (198.78125, -1.75, 5.75),
    ]]
    fillet(fillet3_edges, radius=FILLET3_R)

    # Fillet4
    # the kernel refuses this fillet: 3.22526269 mm, written as the material it takes off along each edge
    with BuildSketch(Plane(origin=(195.211624157, 1.766123282, -0.52885706), x_dir=(0.44042499365627896, 0.8977894101418588, 0), z_dir=(0, 0, 1))) as fillet4_piece_1:
        with BuildLine():
            CenterArc((1.29613147, 3.22526269), FILLET4_R, 206.131000545, 63.868999455)
            Line((-1.599475218, 1.80477639), (-1.889035887, 1.66272776))
            ThreePointArc((-1.889035887, 1.66272776), (-1.577706578, 1.028094938), (-0.150929453, -0.285032444))
            Line((-0.150929453, -0.285032444), (0, -0.322526269))
            Line((0, -0.322526269), (1.29613147, -0.322526269))
            Line((1.29613147, -0.322526269), (1.29613147, 0))
        make_face()
    extrude(amount=6.52885706, mode=Mode.SUBTRACT)

    # Fillet5
    # the kernel refuses this fillet: 3.441550783 mm, written as the material it takes off along each edge
    with BuildSketch(Plane(origin=(171.9453125, -2.0390625, 6), x_dir=(-0.028598923241017205, 0.9995909671407873, 0), z_dir=(0, 0, -1))) as fillet5_piece_1:
        with BuildLine():
            CenterArc((1.756179381, -3.435147573), FILLET5_R, 86.504359351, 82.499227166)
            Line((-1.62218152, -2.778680198), (-1.689748738, -2.76555085))
            ThreePointArc((-1.689748738, -2.76555085), (-1.0632901, -1.228131616), (-0.051589553, 0.045565631))
            Line((-0.051589553, 0.045565631), (-0.001968493, 0.068802862))
            ThreePointArc((-0.001968493, 0.068802862), (0.982292689, 0.090203195), (1.970216473, 0.068702951))
            Line((1.970216473, 0.068702951), (1.966019668, 0))
        make_face()
    extrude(amount=0.5, mode=Mode.SUBTRACT)

    # Fillet6: read off the stored shape, not the designer's step
    # Fillet6 outline → Fillet6 (add)
    with BuildSketch(Plane.XY.offset(FILLET6_START)):
        with BuildLine():
            Line((198.139271979, 1.225312831), (198.783763773, 2.532798575))
            ThreePointArc((198.783763773, 2.532798575), (197.836544352, 1.148706173), (196.5390625, 0.0859375))
            add(Edge.make_bspline(
                [(198.139271979, 1.225312831), (197.648837569, 0.72703147), (197.158971594, 0.22718261), (196.5390625, 0.0859375)],
                knots=[0, 0, 0, 0, 1, 1, 1, 1], degree=3))
        make_face()
    extrude(amount=FILLET6_DEPTH)

    # Fillet7
    fillet7_edges = [part.edges().sort_by_distance(p)[0] for p in [
        (320, 0, 1.5),
    ]]
    fillet(fillet7_edges, radius=FILLET7_R)

    # Fillet8: read off the stored shape, not the designer's step
    # Fillet8 outline → Fillet8 (add)
    with BuildSketch(Plane.XY.offset(FILLET8_START)):
        with BuildLine():
            add(Edge.make_bspline(
                [(173.4296875, -4.4609375), (172.5, -5.3671875), (171.19921875, -5.74609375), (169.8984375, -6.125)],
                knots=[0, 0, 0, 0, 1, 1, 1, 1], degree=3))
            ThreePointArc((173.4296875, -4.4609375), (170.068022443, -5.703138996), (166.509105501, -6.125))
            Line((166.509105501, -6.125), (169.8984375, -6.125))
        make_face()
        with BuildLine():
            Line((169.8671875, 5.5390625), (166.509105501, 5.5390625))
            ThreePointArc((166.509105501, 5.5390625), (170.068022443, 5.117201496), (173.4296875, 3.875))
            add(Edge.make_bspline(
                [(169.8671875, 5.5390625), (171.1796875, 5.16015625), (172.4921875, 4.78125), (173.4296875, 3.875)],
                knots=[0, 0, 0, 0, 1, 1, 1, 1], degree=3))
        make_face()
    extrude(amount=FILLET8_DEPTH)


solid = part.part
